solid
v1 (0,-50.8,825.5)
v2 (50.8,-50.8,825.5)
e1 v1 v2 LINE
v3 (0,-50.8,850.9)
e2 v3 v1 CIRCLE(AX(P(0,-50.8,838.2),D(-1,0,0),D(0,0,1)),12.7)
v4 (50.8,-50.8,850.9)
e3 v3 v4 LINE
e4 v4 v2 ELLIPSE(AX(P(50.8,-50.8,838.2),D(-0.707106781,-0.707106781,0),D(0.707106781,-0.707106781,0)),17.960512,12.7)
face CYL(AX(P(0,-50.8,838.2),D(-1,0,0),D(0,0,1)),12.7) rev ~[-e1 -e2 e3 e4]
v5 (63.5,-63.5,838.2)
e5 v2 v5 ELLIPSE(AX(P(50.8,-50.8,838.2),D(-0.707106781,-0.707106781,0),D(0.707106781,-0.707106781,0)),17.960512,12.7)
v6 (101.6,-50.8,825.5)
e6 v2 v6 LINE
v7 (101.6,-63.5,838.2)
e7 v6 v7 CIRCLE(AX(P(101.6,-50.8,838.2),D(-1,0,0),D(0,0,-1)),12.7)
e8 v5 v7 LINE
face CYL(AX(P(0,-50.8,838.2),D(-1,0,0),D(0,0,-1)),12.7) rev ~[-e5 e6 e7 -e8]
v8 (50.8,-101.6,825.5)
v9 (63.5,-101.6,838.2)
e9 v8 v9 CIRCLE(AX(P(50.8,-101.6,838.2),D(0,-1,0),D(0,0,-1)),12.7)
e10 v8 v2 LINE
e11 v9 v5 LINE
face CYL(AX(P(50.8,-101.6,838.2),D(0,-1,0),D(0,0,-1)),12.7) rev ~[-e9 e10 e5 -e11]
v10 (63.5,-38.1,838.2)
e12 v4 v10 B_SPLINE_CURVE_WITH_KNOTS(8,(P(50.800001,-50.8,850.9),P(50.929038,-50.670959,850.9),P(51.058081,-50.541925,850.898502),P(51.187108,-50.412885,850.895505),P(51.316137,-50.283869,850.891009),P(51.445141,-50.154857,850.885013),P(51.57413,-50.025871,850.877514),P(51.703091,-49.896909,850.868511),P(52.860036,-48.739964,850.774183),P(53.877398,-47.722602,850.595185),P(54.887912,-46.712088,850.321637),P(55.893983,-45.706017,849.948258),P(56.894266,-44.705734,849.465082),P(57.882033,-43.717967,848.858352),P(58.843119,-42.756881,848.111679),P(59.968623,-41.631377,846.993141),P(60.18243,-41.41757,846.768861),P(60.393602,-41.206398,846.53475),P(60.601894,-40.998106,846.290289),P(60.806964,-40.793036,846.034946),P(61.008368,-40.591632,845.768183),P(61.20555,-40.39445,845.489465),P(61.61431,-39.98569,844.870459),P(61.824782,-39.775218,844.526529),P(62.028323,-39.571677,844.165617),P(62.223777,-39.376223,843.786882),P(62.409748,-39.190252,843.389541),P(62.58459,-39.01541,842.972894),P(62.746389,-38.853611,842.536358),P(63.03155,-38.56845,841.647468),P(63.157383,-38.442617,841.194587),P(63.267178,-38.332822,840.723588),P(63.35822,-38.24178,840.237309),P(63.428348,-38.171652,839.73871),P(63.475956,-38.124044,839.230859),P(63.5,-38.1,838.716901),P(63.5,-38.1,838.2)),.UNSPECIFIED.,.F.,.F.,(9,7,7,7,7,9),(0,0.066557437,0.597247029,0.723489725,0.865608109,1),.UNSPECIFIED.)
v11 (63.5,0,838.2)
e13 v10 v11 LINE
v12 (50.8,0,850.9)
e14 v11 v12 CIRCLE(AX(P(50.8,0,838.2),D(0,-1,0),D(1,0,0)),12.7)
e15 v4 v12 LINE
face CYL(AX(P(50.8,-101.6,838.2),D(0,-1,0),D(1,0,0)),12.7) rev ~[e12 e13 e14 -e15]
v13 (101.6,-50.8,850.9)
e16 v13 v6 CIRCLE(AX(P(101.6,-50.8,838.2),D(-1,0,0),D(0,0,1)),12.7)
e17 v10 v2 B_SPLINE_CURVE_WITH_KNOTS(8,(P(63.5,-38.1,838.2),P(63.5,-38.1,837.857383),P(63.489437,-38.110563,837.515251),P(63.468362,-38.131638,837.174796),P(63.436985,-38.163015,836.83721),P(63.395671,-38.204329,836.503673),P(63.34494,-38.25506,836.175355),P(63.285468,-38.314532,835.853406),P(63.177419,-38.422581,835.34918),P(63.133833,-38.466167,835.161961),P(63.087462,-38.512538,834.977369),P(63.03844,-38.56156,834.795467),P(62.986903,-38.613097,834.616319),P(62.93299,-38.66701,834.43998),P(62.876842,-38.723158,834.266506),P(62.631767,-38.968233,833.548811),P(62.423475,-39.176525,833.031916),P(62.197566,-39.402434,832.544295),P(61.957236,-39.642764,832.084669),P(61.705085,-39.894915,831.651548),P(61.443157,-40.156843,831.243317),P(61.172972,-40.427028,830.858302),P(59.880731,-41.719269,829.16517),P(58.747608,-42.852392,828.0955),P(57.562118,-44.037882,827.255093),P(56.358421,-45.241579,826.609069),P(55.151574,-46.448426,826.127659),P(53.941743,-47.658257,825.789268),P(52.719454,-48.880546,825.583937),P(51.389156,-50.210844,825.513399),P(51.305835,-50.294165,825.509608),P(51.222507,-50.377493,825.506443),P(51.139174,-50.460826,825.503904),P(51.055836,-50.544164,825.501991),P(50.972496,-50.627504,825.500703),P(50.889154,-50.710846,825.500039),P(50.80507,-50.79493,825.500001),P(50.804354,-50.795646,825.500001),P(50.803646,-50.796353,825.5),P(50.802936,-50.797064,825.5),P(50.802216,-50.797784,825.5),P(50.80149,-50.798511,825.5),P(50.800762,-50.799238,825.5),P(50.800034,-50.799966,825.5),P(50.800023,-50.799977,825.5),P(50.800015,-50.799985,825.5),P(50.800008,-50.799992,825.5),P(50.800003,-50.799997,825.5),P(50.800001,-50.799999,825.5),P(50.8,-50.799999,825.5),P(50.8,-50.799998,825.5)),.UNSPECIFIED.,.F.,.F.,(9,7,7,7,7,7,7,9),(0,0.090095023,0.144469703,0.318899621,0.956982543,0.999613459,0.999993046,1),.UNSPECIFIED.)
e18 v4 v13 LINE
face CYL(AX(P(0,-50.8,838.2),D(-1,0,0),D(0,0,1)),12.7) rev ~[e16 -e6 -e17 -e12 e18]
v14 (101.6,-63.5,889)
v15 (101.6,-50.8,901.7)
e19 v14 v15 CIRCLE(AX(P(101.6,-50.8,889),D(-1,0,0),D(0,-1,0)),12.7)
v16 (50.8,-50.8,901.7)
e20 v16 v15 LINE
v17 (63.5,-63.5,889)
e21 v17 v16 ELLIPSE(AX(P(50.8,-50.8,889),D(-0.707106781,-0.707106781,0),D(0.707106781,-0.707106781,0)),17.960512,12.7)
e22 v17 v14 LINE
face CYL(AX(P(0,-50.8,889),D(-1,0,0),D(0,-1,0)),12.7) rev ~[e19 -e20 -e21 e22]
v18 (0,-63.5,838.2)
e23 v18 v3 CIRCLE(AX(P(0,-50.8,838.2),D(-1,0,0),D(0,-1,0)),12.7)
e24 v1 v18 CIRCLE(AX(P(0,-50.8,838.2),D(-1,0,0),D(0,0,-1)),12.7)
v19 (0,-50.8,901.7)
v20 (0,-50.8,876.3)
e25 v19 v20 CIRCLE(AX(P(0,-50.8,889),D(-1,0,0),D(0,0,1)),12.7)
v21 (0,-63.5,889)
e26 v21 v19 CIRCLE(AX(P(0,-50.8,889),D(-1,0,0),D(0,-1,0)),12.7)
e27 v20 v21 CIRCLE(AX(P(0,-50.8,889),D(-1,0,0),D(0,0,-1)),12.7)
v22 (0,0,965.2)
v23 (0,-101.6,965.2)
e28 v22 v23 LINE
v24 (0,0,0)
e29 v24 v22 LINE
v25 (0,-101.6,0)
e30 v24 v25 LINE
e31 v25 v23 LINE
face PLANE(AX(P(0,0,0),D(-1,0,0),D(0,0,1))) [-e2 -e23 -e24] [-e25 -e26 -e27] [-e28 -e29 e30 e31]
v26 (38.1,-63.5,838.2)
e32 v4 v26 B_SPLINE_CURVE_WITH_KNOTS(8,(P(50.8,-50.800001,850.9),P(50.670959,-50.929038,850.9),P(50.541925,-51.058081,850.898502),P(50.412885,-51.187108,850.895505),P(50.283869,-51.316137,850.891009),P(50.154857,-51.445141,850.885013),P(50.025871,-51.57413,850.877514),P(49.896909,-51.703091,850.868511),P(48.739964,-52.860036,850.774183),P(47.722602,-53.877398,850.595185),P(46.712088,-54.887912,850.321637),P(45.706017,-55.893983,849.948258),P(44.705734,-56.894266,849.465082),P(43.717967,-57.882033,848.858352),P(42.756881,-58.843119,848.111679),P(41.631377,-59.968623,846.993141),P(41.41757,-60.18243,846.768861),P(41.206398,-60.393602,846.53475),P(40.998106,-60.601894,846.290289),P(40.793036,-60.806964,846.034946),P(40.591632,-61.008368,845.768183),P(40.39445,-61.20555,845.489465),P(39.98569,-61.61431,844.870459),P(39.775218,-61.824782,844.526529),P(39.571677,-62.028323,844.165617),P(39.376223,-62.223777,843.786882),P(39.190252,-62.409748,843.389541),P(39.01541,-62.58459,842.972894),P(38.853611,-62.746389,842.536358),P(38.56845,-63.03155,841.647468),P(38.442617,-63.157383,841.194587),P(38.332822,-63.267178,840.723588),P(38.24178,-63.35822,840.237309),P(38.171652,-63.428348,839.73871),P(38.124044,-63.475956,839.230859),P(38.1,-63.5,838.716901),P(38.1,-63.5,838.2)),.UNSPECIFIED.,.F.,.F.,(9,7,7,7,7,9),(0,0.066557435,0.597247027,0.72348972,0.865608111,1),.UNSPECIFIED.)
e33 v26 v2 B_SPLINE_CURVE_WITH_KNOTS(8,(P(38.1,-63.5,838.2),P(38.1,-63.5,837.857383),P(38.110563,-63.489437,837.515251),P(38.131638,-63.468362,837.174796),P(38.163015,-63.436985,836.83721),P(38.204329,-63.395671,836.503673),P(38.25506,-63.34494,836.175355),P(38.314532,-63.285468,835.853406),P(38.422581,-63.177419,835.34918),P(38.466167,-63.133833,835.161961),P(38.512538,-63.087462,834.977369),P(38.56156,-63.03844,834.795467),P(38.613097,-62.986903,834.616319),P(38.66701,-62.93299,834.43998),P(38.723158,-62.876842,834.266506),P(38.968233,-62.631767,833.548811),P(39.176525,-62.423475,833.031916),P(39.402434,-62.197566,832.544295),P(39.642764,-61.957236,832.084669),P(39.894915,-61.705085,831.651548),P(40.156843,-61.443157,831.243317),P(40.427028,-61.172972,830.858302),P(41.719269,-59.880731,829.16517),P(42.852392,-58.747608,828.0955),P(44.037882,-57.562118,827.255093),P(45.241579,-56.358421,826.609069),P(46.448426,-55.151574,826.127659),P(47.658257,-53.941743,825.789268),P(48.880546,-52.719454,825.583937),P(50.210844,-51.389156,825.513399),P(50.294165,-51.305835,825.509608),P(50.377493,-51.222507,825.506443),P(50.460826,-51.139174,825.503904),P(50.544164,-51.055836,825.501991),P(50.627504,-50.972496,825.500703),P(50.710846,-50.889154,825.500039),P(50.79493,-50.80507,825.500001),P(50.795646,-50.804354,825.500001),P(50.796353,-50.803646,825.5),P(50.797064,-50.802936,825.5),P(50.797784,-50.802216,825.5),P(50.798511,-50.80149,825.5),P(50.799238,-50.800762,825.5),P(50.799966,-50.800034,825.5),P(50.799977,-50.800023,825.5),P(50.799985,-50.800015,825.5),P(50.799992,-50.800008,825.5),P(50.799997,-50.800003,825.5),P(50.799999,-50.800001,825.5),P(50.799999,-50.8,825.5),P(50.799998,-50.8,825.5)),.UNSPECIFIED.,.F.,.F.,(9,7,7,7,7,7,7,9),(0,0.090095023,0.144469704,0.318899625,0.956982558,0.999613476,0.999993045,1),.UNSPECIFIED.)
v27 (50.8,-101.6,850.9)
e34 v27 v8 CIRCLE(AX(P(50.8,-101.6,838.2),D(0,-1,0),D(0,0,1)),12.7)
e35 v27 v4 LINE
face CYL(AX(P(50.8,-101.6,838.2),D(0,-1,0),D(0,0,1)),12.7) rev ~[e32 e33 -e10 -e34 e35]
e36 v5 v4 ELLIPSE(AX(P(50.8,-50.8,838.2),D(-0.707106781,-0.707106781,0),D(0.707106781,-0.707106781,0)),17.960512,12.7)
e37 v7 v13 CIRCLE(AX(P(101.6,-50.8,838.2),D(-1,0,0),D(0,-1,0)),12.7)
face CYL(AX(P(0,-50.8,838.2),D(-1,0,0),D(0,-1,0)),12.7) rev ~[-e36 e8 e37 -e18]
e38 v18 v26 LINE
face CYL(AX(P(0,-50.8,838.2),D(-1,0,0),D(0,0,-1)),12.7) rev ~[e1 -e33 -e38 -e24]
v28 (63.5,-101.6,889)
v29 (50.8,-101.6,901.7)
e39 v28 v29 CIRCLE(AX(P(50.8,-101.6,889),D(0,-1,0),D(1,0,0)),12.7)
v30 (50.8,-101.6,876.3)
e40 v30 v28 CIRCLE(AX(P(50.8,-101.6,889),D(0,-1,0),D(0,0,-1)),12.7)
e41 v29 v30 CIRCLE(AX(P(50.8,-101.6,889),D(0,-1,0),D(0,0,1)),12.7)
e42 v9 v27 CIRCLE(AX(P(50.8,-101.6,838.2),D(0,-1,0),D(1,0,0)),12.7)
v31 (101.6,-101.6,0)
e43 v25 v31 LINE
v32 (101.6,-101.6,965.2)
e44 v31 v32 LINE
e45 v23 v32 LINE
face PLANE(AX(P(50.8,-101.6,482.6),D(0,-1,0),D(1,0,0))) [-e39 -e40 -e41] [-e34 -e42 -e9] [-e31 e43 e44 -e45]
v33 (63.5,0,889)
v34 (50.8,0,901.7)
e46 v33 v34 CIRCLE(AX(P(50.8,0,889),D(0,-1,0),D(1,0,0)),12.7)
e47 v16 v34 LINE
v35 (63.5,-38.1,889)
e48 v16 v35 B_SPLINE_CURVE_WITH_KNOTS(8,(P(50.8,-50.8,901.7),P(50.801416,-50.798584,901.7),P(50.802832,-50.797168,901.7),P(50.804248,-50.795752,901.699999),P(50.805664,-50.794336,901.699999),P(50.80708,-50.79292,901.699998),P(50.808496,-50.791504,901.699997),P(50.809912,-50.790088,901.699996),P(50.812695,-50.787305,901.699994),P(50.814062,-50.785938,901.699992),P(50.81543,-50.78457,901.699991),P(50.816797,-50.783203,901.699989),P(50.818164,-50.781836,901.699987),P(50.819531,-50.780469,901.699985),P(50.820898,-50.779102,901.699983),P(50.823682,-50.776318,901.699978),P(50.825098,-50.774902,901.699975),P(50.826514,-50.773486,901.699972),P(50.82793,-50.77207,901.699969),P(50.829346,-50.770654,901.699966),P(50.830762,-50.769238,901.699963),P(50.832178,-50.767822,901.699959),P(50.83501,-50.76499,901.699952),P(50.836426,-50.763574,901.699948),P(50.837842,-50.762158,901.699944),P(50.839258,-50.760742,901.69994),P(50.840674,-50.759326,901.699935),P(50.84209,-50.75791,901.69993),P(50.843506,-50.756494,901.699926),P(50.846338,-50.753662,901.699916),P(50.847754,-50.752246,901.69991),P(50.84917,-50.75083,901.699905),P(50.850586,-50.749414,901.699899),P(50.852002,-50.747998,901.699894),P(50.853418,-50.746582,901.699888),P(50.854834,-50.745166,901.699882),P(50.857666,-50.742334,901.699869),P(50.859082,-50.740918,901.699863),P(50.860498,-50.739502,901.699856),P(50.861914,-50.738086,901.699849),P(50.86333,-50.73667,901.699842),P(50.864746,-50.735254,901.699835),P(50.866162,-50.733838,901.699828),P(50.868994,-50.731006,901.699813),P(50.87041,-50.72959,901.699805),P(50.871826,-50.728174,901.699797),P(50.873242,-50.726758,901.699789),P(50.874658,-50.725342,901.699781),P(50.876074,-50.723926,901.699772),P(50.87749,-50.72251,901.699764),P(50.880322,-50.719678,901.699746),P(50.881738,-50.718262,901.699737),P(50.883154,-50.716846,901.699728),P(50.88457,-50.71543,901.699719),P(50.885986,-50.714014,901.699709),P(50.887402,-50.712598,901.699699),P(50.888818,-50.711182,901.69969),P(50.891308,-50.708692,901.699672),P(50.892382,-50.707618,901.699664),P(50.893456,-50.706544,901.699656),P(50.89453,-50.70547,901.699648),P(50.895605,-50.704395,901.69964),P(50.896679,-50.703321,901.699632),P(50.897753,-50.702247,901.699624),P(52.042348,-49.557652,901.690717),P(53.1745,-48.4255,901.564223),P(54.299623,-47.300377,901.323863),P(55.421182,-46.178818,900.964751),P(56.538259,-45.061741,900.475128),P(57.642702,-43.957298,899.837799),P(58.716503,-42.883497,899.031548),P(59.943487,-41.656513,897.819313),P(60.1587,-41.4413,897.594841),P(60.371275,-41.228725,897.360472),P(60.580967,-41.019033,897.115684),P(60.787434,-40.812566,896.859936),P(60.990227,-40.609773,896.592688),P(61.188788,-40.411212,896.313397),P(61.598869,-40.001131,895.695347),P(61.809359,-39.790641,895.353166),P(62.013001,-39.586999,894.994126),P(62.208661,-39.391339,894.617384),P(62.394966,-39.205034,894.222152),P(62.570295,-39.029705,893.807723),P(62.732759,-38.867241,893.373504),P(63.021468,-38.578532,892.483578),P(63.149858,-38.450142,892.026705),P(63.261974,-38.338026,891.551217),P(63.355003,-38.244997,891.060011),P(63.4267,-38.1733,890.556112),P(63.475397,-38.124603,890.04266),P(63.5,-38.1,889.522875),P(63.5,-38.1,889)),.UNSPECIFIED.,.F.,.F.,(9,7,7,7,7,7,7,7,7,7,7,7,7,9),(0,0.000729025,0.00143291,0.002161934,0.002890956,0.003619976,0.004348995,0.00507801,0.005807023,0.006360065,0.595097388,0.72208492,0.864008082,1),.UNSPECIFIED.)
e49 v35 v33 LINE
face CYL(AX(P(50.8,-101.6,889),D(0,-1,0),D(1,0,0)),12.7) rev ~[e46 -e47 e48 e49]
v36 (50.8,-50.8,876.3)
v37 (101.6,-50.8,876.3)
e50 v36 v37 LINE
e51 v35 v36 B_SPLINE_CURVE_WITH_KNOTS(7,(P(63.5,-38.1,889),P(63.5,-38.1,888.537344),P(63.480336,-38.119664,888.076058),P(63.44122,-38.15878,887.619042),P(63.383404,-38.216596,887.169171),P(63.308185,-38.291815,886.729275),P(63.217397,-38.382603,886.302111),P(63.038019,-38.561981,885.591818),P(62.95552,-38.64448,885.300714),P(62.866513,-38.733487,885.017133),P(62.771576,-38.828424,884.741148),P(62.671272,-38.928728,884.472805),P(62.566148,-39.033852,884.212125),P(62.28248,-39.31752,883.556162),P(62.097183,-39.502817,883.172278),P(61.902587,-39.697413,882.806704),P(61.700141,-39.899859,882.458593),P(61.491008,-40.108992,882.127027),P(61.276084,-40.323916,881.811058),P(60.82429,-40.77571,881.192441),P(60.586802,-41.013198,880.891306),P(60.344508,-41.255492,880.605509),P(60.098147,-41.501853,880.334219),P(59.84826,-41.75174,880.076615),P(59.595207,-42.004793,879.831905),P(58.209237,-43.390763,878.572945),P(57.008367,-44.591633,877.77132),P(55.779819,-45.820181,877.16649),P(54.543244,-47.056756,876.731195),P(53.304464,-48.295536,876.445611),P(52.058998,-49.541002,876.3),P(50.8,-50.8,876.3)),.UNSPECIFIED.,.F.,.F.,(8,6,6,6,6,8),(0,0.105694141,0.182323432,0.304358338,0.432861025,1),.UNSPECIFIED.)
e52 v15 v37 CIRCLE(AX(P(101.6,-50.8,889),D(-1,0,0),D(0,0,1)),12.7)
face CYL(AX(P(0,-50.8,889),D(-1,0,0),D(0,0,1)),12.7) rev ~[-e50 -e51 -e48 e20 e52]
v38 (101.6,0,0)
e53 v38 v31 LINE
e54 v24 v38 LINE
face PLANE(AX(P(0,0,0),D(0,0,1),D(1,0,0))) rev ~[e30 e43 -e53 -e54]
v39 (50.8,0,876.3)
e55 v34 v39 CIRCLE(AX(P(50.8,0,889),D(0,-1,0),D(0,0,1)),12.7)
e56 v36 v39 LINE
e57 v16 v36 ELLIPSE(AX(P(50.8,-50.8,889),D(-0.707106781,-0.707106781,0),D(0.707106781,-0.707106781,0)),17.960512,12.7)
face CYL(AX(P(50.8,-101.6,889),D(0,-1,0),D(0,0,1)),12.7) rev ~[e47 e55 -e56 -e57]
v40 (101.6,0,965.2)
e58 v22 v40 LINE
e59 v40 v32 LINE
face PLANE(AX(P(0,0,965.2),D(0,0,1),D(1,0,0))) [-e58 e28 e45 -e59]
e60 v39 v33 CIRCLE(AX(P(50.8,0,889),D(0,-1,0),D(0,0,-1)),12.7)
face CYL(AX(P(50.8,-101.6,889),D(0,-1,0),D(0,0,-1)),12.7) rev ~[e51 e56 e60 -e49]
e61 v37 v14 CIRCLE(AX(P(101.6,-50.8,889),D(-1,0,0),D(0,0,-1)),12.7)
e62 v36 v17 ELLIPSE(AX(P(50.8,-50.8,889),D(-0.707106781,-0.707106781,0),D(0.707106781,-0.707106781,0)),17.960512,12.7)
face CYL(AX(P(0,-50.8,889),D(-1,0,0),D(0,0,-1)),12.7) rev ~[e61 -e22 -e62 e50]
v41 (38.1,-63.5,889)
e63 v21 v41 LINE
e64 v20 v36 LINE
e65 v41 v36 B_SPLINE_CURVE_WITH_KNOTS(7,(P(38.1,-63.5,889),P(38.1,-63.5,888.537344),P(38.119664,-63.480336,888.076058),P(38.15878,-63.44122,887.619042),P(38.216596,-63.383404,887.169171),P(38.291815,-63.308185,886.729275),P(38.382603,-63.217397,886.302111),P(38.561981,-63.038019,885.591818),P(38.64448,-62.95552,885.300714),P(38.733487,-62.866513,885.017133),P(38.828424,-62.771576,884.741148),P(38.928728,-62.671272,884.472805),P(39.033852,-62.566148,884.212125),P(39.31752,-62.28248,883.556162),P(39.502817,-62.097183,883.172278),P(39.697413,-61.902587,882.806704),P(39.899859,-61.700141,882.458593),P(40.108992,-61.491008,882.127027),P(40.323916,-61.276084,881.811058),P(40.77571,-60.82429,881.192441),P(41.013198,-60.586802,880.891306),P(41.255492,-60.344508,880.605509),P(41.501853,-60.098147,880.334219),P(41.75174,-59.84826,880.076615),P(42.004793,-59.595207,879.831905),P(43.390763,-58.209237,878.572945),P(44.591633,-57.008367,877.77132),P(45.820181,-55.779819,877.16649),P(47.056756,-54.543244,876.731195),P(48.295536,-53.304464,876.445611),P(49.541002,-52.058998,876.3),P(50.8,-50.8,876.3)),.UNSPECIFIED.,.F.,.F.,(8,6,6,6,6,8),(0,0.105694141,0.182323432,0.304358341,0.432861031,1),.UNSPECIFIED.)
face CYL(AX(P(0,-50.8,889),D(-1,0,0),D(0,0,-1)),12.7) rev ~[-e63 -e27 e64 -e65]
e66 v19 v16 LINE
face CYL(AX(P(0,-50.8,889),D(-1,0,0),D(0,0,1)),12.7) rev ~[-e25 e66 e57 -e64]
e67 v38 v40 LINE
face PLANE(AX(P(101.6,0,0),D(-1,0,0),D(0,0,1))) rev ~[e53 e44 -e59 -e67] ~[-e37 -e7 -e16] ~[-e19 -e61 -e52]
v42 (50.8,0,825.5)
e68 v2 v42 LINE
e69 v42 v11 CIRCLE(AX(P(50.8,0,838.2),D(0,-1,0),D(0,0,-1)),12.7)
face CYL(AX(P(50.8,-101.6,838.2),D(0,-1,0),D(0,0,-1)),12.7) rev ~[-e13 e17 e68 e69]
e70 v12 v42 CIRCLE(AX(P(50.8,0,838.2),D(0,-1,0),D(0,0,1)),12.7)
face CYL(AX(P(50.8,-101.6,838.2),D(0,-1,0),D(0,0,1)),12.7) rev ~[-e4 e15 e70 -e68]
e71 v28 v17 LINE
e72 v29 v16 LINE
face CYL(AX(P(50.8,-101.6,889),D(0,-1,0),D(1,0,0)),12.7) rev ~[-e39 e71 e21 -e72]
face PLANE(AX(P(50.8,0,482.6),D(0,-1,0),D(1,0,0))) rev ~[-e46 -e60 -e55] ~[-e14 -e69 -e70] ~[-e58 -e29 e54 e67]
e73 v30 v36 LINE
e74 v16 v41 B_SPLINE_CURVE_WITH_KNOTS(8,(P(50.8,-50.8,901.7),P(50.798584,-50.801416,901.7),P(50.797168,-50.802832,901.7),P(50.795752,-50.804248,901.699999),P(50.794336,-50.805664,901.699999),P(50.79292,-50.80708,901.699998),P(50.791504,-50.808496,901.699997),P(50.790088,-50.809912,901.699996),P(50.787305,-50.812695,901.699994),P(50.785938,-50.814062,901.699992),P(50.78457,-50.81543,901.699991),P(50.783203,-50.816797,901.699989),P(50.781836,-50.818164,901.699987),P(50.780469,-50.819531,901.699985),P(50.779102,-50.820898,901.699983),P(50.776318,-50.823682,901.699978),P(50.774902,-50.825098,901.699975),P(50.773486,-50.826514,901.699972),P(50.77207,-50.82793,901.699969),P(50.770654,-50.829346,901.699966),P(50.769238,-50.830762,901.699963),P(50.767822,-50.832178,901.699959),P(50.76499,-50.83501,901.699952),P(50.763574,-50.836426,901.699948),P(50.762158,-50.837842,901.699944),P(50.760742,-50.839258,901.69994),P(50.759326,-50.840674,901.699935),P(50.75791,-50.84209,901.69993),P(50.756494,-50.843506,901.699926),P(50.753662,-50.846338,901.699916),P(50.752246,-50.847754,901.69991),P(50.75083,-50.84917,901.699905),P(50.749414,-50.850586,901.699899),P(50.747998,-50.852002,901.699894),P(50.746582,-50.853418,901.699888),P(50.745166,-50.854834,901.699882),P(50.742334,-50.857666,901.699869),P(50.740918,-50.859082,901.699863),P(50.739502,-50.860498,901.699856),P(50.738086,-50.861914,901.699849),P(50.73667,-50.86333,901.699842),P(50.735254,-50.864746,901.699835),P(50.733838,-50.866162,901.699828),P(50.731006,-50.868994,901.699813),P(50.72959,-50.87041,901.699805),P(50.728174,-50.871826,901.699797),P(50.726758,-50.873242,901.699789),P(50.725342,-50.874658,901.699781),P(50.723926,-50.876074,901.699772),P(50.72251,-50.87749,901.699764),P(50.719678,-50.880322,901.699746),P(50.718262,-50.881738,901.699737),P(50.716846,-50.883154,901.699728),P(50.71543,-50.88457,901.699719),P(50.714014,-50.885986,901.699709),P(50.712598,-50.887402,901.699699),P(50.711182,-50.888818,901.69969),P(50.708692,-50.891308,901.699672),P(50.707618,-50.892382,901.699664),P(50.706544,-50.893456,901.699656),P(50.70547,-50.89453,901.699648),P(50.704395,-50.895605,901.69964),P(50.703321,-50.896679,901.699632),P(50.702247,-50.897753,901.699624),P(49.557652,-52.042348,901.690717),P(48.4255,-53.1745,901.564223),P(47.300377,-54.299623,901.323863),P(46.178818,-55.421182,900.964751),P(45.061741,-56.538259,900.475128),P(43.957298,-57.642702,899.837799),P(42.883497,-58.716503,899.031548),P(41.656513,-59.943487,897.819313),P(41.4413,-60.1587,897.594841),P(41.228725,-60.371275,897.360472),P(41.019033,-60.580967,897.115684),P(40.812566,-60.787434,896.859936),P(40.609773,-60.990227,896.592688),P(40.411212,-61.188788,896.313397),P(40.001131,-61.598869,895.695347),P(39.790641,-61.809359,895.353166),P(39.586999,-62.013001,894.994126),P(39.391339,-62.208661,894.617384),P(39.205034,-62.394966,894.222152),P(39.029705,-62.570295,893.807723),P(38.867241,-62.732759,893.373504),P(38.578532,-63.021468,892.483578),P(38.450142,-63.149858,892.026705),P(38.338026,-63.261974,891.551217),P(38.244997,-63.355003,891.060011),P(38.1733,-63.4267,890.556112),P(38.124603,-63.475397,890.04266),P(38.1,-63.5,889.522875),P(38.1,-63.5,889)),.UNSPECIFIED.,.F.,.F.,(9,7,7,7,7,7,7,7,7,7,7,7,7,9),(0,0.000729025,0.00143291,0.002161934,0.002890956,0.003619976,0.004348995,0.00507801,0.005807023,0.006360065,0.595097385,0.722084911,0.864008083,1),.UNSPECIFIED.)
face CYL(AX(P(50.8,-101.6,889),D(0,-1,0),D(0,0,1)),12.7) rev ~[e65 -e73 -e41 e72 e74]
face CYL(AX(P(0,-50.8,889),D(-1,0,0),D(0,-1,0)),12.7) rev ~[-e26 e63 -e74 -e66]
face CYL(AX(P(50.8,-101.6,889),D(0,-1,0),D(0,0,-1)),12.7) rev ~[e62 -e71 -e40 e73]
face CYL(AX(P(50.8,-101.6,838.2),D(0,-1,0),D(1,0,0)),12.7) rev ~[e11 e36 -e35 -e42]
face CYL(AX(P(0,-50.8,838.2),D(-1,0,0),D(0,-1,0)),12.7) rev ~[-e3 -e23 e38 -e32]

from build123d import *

# Parameters (mm, degrees)
F0_W     = 101.6
F0_H     = 965.2
F1_DEPTH = 101.6
F3_DEPTH = 101.601
F5_DEPTH = 101.601


with BuildPart() as f1:
    # F0 (on Front) → F1 (new body)
    with BuildSketch(Plane.XZ):
        with Locations((50.8, 482.6)):
            Rectangle(F0_W, F0_H)
    extrude(amount=F1_DEPTH)

    # F2 (on face) → F3 (cut, through all)
    with BuildSketch(Plane.XZ.offset(101.6)):
        with BuildLine():
            ThreePointArc((63.5, 889), (59.7802561211, 897.9802561211), (50.8, 901.7))
            Line((50.8, 901.7), (50.8, 876.3))
            ThreePointArc((50.8, 876.3), (59.7802561211, 880.0197438789), (63.5, 889))
        make_face()
        with BuildLine():
            ThreePointArc((63.5, 838.2), (59.7802561211, 847.1802561211), (50.8, 850.9))
            Line((50.8, 850.9), (50.8, 825.5))
            ThreePointArc((50.8, 825.5), (59.7802561211, 829.2197438789), (63.5, 838.2))
        make_face()
        with BuildLine():
            Line((50.8, 825.5), (50.8, 850.9))
            ThreePointArc((50.8, 850.9), (38.1, 838.2), (50.8, 825.5))
        make_face()
        with BuildLine():
            Line((50.8, 876.3), (50.8, 901.7))
            ThreePointArc((50.8, 901.7), (38.1, 889), (50.8, 876.3))
        make_face()
    extrude(amount=-F3_DEPTH, mode=Mode.SUBTRACT)

    # F4 (on face) → F5 (cut, through all)
    with BuildSketch(Plane(origin=(0, 0, 0), x_dir=(0, -1, 0), z_dir=(-1, 0, 0))):
        with BuildLine():
            ThreePointArc((63.5, 889), (59.7802561211, 897.9802561211), (50.8, 901.7))
            Line((50.8, 901.7), (50.8, 876.3))
            ThreePointArc((50.8, 876.3), (59.7802561211, 880.0197438789), (63.5, 889))
        make_face()
        with BuildLine():
            ThreePointArc((63.5, 838.2), (59.7802561211, 847.1802561211), (50.8, 850.9))
            Line((50.8, 850.9), (50.8, 825.5))
            ThreePointArc((50.8, 825.5), (59.7802561211, 829.2197438789), (63.5, 838.2))
        make_face()
        with BuildLine():
            Line((50.8, 825.5), (50.8, 850.9))
            ThreePointArc((50.8, 850.9), (38.1, 838.2), (50.8, 825.5))
        make_face()
        with BuildLine():
            Line((50.8, 876.3), (50.8, 901.7))
            ThreePointArc((50.8, 901.7), (38.1, 889), (50.8, 876.3))
        make_face()
    extrude(amount=-F5_DEPTH, mode=Mode.SUBTRACT)


solid = f1.part
